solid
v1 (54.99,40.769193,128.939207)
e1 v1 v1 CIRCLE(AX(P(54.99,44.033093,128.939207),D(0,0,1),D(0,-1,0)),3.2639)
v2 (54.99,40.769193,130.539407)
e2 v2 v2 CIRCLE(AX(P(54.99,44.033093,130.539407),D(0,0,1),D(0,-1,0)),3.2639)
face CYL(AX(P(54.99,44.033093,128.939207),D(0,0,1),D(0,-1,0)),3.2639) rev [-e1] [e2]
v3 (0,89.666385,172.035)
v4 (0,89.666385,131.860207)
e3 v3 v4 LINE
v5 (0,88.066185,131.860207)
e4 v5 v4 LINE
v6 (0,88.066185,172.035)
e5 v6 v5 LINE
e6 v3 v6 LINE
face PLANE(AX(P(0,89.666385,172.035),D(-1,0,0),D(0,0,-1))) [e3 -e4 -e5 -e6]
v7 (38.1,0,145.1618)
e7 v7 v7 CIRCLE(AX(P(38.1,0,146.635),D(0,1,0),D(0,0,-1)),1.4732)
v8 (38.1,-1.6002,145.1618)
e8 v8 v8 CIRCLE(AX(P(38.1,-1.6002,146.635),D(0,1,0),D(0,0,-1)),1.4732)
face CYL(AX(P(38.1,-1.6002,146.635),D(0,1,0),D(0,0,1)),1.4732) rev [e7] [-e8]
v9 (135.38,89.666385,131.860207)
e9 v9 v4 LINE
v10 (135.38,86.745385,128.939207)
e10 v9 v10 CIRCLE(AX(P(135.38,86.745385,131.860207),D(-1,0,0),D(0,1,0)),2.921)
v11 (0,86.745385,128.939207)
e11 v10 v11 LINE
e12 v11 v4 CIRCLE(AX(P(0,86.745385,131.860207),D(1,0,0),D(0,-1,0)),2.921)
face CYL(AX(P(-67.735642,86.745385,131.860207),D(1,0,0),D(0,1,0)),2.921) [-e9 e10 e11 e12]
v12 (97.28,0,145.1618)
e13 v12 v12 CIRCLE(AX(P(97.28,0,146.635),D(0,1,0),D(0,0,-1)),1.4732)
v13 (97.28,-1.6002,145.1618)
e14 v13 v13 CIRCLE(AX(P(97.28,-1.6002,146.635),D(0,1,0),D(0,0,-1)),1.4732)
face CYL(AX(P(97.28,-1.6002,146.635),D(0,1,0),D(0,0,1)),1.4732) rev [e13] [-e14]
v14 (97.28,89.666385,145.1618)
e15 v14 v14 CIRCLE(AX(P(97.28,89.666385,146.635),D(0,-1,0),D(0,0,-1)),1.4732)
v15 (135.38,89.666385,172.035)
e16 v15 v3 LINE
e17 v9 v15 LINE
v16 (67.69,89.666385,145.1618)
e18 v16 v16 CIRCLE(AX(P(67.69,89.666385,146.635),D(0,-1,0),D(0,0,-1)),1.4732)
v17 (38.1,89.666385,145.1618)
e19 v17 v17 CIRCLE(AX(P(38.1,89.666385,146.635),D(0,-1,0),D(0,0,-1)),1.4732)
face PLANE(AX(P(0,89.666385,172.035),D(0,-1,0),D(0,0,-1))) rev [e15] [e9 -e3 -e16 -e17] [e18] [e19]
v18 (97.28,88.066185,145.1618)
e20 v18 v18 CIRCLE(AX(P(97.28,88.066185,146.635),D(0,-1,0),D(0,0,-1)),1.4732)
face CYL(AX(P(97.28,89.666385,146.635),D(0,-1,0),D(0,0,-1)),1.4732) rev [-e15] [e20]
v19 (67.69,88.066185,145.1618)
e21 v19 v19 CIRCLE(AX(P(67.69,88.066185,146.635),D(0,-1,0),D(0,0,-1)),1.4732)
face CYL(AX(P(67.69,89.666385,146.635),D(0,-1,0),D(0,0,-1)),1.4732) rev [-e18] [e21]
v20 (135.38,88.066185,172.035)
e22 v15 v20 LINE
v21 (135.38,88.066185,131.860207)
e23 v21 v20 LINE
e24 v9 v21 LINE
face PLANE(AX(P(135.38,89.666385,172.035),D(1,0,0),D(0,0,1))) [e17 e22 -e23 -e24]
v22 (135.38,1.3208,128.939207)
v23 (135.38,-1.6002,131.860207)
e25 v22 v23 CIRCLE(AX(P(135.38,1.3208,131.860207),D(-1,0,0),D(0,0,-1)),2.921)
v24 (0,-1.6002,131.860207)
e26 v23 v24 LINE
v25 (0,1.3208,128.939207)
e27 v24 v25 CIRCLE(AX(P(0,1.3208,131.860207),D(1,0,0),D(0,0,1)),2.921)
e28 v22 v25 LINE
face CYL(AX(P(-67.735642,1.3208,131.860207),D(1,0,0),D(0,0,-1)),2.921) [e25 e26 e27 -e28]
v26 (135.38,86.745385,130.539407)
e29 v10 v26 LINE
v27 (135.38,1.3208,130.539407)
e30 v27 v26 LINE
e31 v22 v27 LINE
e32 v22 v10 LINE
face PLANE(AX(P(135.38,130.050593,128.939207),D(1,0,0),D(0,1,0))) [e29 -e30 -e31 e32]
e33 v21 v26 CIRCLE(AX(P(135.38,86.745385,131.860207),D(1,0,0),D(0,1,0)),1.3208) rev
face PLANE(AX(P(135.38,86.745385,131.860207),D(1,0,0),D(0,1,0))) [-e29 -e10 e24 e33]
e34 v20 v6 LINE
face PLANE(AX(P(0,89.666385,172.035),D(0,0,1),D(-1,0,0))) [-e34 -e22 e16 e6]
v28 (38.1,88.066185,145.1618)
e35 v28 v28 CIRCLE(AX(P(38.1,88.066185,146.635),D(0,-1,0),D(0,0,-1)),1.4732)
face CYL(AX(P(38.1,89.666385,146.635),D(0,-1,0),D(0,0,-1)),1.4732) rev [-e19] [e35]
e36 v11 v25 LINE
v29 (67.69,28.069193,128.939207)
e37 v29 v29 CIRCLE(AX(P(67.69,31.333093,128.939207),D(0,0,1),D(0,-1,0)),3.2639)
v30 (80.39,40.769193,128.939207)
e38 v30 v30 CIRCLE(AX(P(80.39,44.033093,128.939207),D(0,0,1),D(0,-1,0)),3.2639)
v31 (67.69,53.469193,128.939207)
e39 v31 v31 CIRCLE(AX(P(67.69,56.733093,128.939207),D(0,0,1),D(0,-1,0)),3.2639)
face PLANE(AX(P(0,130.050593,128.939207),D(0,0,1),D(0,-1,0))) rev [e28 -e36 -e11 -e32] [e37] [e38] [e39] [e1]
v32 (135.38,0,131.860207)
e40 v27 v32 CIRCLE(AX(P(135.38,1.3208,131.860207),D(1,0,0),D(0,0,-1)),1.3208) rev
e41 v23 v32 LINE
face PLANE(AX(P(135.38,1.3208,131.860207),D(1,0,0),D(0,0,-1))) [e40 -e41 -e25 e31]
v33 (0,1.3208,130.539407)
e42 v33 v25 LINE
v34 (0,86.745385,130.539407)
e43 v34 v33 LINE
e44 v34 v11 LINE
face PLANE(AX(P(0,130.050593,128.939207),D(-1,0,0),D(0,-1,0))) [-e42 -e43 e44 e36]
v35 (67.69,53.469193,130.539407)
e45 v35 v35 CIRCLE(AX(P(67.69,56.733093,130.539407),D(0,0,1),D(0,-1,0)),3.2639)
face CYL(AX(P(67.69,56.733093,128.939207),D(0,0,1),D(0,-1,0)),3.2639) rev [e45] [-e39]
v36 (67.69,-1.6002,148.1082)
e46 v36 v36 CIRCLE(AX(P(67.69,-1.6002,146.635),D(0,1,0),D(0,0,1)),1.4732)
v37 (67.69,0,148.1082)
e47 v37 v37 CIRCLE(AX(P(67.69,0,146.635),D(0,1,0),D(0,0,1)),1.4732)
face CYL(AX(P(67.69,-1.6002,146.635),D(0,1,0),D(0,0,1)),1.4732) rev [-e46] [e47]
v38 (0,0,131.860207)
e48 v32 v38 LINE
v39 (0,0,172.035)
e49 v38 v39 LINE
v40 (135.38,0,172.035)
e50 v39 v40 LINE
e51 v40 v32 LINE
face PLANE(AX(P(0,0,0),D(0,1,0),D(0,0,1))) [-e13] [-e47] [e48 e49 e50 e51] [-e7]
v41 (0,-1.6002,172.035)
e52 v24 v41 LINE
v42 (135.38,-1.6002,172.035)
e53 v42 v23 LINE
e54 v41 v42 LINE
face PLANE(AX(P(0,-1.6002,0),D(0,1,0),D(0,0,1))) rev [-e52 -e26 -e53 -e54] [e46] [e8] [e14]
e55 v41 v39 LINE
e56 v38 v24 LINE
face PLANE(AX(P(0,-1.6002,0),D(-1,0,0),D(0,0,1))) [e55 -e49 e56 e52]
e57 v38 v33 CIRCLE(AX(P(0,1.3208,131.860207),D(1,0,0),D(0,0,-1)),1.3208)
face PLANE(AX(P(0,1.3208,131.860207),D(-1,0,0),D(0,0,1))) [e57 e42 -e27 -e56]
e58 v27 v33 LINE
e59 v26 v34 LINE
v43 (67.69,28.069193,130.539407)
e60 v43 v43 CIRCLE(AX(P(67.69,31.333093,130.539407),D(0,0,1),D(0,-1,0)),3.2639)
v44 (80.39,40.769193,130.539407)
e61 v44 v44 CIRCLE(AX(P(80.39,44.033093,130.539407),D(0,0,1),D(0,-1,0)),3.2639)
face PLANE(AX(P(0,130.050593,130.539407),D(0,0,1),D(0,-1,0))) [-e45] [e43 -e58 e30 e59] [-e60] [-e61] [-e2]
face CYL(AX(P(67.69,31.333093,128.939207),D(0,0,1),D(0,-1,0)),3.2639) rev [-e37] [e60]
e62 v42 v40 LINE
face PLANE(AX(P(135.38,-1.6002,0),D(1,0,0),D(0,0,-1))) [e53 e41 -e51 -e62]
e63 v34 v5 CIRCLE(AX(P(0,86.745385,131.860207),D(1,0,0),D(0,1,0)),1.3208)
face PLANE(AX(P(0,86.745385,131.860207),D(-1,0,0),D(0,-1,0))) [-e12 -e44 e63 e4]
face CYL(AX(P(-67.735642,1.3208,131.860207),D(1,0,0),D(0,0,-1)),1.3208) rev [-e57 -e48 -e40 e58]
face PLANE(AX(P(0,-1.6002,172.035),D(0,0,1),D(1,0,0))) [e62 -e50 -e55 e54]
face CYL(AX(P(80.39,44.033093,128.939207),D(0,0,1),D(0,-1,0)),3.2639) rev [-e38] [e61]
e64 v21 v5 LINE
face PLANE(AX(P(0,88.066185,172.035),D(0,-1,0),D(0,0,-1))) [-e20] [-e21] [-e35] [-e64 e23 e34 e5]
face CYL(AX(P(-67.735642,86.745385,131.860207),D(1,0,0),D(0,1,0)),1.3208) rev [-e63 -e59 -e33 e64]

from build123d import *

# Parameters (mm, degrees)
SKETCH1_W                  = 135.38
SKETCH1_H                  = 172.035
SKETCH1_R                  = 3.2639
SKETCH1_R_2                = 1.4732
BASE_FLANGE1_DEPTH         = 1.6002
SKETCHED_BEND1_OUTLINE_W   = 135.38
SKETCHED_BEND1_OUTLINE_H   = 1.6002
SKETCHED_BEND1_DEPTH       = 129.239310973
SKETCHED_START             = 148.1082001
SKETCHED_BEND1_2_OUTLINE_W = 135.38
SKETCHED_BEND1_2_OUTLINE_H = 1.6002
SKETCHED_BEND1_2_DEPTH     = 23.9267999
SKETCHED_START_2           = 131.860207433
SKETCHED_BEND1_3_OUTLINE_W = 135.38
SKETCHED_BEND1_3_OUTLINE_H = 1.6002
SKETCHED_BEND1_3_DEPTH     = 13.301592467
SKETCHED_START_3           = 130.391703893
SKETCHED_BEND1_4_OUTLINE_W = 135.38
SKETCHED_BEND1_4_OUTLINE_H = 88.066185133
SKETCHED_BEND1_4_OUTLINE_R = 3.2639
SKETCHED_BEND1_4_DEPTH     = 0.14770354
SKETCHED_START_4           = 128.939207433
SKETCHED_BEND1_5_OUTLINE_W = 135.38
SKETCHED_BEND1_5_OUTLINE_H = 88.066185133
SKETCHED_BEND1_5_OUTLINE_R = 3.2639
SKETCHED_BEND1_5_DEPTH     = 2.921
SKETCHED_START_5           = 129.239310973
SKETCHED_BEND1_6_OUTLINE_W = 135.38
SKETCHED_BEND1_6_OUTLINE_H = 1.6002
SKETCHED_BEND1_6_DEPTH     = 18.868889127
SKETCHED_BEND1_7_DEPTH     = 135.38
SKETCHED_START_6           = 87
SKETCHED_BEND1_8_OUTLINE_R = 1.4732
SKETCHED_BEND1_8_DEPTH     = 4


with BuildPart() as part:
    # Base-Flange1: sheet metal written as solids
    # Sketch1 → Base-Flange1 (new body)
    with BuildSketch(Plane(origin=(0, 0, 0), x_dir=(1, 0, 0), z_dir=(0, 1, 0))):
        with Locations((67.69, -86.0175)):
            Rectangle(SKETCH1_W, SKETCH1_H)
        with Locations(Location((67.69, -73.3175, 0), (0, 0, 270))):
            Circle(SKETCH1_R, mode=Mode.SUBTRACT)
        with Locations(Location((67.69, -98.7175, 0), (0, 0, 270))):
            Circle(SKETCH1_R, mode=Mode.SUBTRACT)
        with Locations(Location((54.99, -86.0175, 0), (0, 0, 270))):
            Circle(SKETCH1_R, mode=Mode.SUBTRACT)
        with Locations(Location((80.39, -86.0175, 0), (0, 0, 270))):
            Circle(SKETCH1_R, mode=Mode.SUBTRACT)
        with Locations(Location((38.1, -25.4, 0), (0, 0, 270))):
            Circle(SKETCH1_R_2, mode=Mode.SUBTRACT)
        with Locations(Location((97.28, -25.4, 0), (0, 0, 270))):
            Circle(SKETCH1_R_2, mode=Mode.SUBTRACT)
        with Locations(Location((97.28, -146.635, 0), (0, 0, 90))):
            Circle(SKETCH1_R_2, mode=Mode.SUBTRACT)
        with Locations(Location((38.1, -146.635, 0), (0, 0, 90))):
            Circle(SKETCH1_R_2, mode=Mode.SUBTRACT)
        with Locations(Location((67.69, -25.4, 0), (0, 0, 270))):
            Circle(SKETCH1_R_2, mode=Mode.SUBTRACT)
        with Locations(Location((67.69, -146.635, 0), (0, 0, 270))):
            Circle(SKETCH1_R_2, mode=Mode.SUBTRACT)
    extrude(amount=-BASE_FLANGE1_DEPTH)

    # Sketched Bend1: read off the stored shape, not the designer's step
    # Sketched Bend1 outline → Sketched Bend1 (cut)
    with BuildSketch(Plane.XY):
        with Locations((67.69, -0.8001)):
            Rectangle(SKETCHED_BEND1_OUTLINE_W, SKETCHED_BEND1_OUTLINE_H)
    extrude(amount=SKETCHED_BEND1_DEPTH, mode=Mode.SUBTRACT)

    # Sketched Bend1 4 outline → Sketched Bend1 4 (add)
    with BuildSketch(Plane.XY.offset(SKETCHED_START_3)):
        with Locations((67.69, 44.033092567)):
            Rectangle(SKETCHED_BEND1_4_OUTLINE_W, SKETCHED_BEND1_4_OUTLINE_H)
        with Locations((67.69, 31.333092567)):
            Circle(SKETCHED_BEND1_4_OUTLINE_R, mode=Mode.SUBTRACT)
        with Locations((54.99, 44.033092567)):
            Circle(SKETCHED_BEND1_4_OUTLINE_R, mode=Mode.SUBTRACT)
        with Locations((80.39, 44.033092567)):
            Circle(SKETCHED_BEND1_4_OUTLINE_R, mode=Mode.SUBTRACT)
        with Locations((67.69, 56.733092567)):
            Circle(SKETCHED_BEND1_4_OUTLINE_R, mode=Mode.SUBTRACT)
    extrude(amount=SKETCHED_BEND1_4_DEPTH)



with BuildPart() as body_2:
    # Sketched Bend1 2 outline → Sketched Bend1 2 (new body)
    with BuildSketch(Plane.XY.offset(SKETCHED_START)):
        with Locations((67.69, 88.866285133)):
            Rectangle(SKETCHED_BEND1_2_OUTLINE_W, SKETCHED_BEND1_2_OUTLINE_H)
    extrude(amount=SKETCHED_BEND1_2_DEPTH)


with BuildPart() as body_3:
    # Sketched Bend1 3 outline → Sketched Bend1 3 (new body)
    with BuildSketch(Plane.XY.offset(SKETCHED_START_2)):
        with Locations((67.69, 88.866285133)):
            Rectangle(SKETCHED_BEND1_3_OUTLINE_W, SKETCHED_BEND1_3_OUTLINE_H)
    extrude(amount=SKETCHED_BEND1_3_DEPTH)


with BuildPart() as part_1:
    add(part.part)

    add(body_3.part)  # Sketched Bend1 5 merges body 3
    # Sketched Bend1 5 outline → Sketched Bend1 5 (add)
    with BuildSketch(Plane.XY.offset(SKETCHED_START_4)):
        with Locations((67.69, 44.033092567)):
            Rectangle(SKETCHED_BEND1_5_OUTLINE_W, SKETCHED_BEND1_5_OUTLINE_H)
        with Locations((67.69, 31.333092567)):
            Circle(SKETCHED_BEND1_5_OUTLINE_R, mode=Mode.SUBTRACT)
        with Locations((54.99, 44.033092567)):
            Circle(SKETCHED_BEND1_5_OUTLINE_R, mode=Mode.SUBTRACT)
        with Locations((80.39, 44.033092567)):
            Circle(SKETCHED_BEND1_5_OUTLINE_R, mode=Mode.SUBTRACT)
        with Locations((67.69, 56.733092567)):
            Circle(SKETCHED_BEND1_5_OUTLINE_R, mode=Mode.SUBTRACT)
    extrude(amount=SKETCHED_BEND1_5_DEPTH)


    add(body_2.part)  # Sketched Bend1 6 merges body 2
    # Sketched Bend1 6 outline → Sketched Bend1 6 (add)
    with BuildSketch(Plane.XY.offset(SKETCHED_START_5)):
        with Locations((67.69, 88.866285133)):
            Rectangle(SKETCHED_BEND1_6_OUTLINE_W, SKETCHED_BEND1_6_OUTLINE_H)
    extrude(amount=SKETCHED_BEND1_6_DEPTH)

    # Sketched Bend1 7 outline → Sketched Bend1 7 (cut)
    with BuildSketch(Plane.YZ):
        with BuildLine():
            Line((1.3208, 130.539407433), (86.745385133, 130.539407433))
            ThreePointArc((86.745385133, 130.539407433), (87.67933177, 130.926260797), (88.066185133, 131.860207433))
            Line((88.066185133, 131.860207433), (0, 131.860207433))
            ThreePointArc((0, 131.860207433), (0.386853363, 130.926260797), (1.3208, 130.539407433))
        make_face()
        with BuildLine():
            Line((0, 128.939207433), (1.3208, 128.939207433))
            ThreePointArc((1.3208, 128.939207433), (-0.744658907, 129.794748526), (-1.6002, 131.860207433))
            Line((-1.6002, 131.860207433), (-1.6002, 129.239310973))
            Line((-1.6002, 129.239310973), (0, 129.239310973))
            Line((0, 129.239310973), (0, 128.939207433))
        make_face()
        with BuildLine():
            ThreePointArc((89.666385133, 131.860207433), (88.810844041, 129.794748526), (86.745385133, 128.939207433))
            Line((86.745385133, 128.939207433), (88.066185133, 128.939207433))
            Line((88.066185133, 128.939207433), (88.066185133, 129.239310973))
            Line((88.066185133, 129.239310973), (89.666385133, 129.239310973))
            Line((89.666385133, 129.239310973), (89.666385133, 131.860207433))
        make_face()
    extrude(amount=SKETCHED_BEND1_7_DEPTH, mode=Mode.SUBTRACT)

    # Sketched Bend1 8 outline → Sketched Bend1 8 (cut)
    with BuildSketch(Plane(origin=(0, 0, 0), x_dir=(1, 0, 0), z_dir=(0, 1, 0)).offset(SKETCHED_START_6)):
        with Locations((67.69, -146.635)):
            Circle(SKETCHED_BEND1_8_OUTLINE_R)
        with Locations((97.28, -146.635)):
            Circle(SKETCHED_BEND1_8_OUTLINE_R)
        with Locations((38.1, -146.635)):
            Circle(SKETCHED_BEND1_8_OUTLINE_R)
    extrude(amount=SKETCHED_BEND1_8_DEPTH, mode=Mode.SUBTRACT)


solid = part_1.part
